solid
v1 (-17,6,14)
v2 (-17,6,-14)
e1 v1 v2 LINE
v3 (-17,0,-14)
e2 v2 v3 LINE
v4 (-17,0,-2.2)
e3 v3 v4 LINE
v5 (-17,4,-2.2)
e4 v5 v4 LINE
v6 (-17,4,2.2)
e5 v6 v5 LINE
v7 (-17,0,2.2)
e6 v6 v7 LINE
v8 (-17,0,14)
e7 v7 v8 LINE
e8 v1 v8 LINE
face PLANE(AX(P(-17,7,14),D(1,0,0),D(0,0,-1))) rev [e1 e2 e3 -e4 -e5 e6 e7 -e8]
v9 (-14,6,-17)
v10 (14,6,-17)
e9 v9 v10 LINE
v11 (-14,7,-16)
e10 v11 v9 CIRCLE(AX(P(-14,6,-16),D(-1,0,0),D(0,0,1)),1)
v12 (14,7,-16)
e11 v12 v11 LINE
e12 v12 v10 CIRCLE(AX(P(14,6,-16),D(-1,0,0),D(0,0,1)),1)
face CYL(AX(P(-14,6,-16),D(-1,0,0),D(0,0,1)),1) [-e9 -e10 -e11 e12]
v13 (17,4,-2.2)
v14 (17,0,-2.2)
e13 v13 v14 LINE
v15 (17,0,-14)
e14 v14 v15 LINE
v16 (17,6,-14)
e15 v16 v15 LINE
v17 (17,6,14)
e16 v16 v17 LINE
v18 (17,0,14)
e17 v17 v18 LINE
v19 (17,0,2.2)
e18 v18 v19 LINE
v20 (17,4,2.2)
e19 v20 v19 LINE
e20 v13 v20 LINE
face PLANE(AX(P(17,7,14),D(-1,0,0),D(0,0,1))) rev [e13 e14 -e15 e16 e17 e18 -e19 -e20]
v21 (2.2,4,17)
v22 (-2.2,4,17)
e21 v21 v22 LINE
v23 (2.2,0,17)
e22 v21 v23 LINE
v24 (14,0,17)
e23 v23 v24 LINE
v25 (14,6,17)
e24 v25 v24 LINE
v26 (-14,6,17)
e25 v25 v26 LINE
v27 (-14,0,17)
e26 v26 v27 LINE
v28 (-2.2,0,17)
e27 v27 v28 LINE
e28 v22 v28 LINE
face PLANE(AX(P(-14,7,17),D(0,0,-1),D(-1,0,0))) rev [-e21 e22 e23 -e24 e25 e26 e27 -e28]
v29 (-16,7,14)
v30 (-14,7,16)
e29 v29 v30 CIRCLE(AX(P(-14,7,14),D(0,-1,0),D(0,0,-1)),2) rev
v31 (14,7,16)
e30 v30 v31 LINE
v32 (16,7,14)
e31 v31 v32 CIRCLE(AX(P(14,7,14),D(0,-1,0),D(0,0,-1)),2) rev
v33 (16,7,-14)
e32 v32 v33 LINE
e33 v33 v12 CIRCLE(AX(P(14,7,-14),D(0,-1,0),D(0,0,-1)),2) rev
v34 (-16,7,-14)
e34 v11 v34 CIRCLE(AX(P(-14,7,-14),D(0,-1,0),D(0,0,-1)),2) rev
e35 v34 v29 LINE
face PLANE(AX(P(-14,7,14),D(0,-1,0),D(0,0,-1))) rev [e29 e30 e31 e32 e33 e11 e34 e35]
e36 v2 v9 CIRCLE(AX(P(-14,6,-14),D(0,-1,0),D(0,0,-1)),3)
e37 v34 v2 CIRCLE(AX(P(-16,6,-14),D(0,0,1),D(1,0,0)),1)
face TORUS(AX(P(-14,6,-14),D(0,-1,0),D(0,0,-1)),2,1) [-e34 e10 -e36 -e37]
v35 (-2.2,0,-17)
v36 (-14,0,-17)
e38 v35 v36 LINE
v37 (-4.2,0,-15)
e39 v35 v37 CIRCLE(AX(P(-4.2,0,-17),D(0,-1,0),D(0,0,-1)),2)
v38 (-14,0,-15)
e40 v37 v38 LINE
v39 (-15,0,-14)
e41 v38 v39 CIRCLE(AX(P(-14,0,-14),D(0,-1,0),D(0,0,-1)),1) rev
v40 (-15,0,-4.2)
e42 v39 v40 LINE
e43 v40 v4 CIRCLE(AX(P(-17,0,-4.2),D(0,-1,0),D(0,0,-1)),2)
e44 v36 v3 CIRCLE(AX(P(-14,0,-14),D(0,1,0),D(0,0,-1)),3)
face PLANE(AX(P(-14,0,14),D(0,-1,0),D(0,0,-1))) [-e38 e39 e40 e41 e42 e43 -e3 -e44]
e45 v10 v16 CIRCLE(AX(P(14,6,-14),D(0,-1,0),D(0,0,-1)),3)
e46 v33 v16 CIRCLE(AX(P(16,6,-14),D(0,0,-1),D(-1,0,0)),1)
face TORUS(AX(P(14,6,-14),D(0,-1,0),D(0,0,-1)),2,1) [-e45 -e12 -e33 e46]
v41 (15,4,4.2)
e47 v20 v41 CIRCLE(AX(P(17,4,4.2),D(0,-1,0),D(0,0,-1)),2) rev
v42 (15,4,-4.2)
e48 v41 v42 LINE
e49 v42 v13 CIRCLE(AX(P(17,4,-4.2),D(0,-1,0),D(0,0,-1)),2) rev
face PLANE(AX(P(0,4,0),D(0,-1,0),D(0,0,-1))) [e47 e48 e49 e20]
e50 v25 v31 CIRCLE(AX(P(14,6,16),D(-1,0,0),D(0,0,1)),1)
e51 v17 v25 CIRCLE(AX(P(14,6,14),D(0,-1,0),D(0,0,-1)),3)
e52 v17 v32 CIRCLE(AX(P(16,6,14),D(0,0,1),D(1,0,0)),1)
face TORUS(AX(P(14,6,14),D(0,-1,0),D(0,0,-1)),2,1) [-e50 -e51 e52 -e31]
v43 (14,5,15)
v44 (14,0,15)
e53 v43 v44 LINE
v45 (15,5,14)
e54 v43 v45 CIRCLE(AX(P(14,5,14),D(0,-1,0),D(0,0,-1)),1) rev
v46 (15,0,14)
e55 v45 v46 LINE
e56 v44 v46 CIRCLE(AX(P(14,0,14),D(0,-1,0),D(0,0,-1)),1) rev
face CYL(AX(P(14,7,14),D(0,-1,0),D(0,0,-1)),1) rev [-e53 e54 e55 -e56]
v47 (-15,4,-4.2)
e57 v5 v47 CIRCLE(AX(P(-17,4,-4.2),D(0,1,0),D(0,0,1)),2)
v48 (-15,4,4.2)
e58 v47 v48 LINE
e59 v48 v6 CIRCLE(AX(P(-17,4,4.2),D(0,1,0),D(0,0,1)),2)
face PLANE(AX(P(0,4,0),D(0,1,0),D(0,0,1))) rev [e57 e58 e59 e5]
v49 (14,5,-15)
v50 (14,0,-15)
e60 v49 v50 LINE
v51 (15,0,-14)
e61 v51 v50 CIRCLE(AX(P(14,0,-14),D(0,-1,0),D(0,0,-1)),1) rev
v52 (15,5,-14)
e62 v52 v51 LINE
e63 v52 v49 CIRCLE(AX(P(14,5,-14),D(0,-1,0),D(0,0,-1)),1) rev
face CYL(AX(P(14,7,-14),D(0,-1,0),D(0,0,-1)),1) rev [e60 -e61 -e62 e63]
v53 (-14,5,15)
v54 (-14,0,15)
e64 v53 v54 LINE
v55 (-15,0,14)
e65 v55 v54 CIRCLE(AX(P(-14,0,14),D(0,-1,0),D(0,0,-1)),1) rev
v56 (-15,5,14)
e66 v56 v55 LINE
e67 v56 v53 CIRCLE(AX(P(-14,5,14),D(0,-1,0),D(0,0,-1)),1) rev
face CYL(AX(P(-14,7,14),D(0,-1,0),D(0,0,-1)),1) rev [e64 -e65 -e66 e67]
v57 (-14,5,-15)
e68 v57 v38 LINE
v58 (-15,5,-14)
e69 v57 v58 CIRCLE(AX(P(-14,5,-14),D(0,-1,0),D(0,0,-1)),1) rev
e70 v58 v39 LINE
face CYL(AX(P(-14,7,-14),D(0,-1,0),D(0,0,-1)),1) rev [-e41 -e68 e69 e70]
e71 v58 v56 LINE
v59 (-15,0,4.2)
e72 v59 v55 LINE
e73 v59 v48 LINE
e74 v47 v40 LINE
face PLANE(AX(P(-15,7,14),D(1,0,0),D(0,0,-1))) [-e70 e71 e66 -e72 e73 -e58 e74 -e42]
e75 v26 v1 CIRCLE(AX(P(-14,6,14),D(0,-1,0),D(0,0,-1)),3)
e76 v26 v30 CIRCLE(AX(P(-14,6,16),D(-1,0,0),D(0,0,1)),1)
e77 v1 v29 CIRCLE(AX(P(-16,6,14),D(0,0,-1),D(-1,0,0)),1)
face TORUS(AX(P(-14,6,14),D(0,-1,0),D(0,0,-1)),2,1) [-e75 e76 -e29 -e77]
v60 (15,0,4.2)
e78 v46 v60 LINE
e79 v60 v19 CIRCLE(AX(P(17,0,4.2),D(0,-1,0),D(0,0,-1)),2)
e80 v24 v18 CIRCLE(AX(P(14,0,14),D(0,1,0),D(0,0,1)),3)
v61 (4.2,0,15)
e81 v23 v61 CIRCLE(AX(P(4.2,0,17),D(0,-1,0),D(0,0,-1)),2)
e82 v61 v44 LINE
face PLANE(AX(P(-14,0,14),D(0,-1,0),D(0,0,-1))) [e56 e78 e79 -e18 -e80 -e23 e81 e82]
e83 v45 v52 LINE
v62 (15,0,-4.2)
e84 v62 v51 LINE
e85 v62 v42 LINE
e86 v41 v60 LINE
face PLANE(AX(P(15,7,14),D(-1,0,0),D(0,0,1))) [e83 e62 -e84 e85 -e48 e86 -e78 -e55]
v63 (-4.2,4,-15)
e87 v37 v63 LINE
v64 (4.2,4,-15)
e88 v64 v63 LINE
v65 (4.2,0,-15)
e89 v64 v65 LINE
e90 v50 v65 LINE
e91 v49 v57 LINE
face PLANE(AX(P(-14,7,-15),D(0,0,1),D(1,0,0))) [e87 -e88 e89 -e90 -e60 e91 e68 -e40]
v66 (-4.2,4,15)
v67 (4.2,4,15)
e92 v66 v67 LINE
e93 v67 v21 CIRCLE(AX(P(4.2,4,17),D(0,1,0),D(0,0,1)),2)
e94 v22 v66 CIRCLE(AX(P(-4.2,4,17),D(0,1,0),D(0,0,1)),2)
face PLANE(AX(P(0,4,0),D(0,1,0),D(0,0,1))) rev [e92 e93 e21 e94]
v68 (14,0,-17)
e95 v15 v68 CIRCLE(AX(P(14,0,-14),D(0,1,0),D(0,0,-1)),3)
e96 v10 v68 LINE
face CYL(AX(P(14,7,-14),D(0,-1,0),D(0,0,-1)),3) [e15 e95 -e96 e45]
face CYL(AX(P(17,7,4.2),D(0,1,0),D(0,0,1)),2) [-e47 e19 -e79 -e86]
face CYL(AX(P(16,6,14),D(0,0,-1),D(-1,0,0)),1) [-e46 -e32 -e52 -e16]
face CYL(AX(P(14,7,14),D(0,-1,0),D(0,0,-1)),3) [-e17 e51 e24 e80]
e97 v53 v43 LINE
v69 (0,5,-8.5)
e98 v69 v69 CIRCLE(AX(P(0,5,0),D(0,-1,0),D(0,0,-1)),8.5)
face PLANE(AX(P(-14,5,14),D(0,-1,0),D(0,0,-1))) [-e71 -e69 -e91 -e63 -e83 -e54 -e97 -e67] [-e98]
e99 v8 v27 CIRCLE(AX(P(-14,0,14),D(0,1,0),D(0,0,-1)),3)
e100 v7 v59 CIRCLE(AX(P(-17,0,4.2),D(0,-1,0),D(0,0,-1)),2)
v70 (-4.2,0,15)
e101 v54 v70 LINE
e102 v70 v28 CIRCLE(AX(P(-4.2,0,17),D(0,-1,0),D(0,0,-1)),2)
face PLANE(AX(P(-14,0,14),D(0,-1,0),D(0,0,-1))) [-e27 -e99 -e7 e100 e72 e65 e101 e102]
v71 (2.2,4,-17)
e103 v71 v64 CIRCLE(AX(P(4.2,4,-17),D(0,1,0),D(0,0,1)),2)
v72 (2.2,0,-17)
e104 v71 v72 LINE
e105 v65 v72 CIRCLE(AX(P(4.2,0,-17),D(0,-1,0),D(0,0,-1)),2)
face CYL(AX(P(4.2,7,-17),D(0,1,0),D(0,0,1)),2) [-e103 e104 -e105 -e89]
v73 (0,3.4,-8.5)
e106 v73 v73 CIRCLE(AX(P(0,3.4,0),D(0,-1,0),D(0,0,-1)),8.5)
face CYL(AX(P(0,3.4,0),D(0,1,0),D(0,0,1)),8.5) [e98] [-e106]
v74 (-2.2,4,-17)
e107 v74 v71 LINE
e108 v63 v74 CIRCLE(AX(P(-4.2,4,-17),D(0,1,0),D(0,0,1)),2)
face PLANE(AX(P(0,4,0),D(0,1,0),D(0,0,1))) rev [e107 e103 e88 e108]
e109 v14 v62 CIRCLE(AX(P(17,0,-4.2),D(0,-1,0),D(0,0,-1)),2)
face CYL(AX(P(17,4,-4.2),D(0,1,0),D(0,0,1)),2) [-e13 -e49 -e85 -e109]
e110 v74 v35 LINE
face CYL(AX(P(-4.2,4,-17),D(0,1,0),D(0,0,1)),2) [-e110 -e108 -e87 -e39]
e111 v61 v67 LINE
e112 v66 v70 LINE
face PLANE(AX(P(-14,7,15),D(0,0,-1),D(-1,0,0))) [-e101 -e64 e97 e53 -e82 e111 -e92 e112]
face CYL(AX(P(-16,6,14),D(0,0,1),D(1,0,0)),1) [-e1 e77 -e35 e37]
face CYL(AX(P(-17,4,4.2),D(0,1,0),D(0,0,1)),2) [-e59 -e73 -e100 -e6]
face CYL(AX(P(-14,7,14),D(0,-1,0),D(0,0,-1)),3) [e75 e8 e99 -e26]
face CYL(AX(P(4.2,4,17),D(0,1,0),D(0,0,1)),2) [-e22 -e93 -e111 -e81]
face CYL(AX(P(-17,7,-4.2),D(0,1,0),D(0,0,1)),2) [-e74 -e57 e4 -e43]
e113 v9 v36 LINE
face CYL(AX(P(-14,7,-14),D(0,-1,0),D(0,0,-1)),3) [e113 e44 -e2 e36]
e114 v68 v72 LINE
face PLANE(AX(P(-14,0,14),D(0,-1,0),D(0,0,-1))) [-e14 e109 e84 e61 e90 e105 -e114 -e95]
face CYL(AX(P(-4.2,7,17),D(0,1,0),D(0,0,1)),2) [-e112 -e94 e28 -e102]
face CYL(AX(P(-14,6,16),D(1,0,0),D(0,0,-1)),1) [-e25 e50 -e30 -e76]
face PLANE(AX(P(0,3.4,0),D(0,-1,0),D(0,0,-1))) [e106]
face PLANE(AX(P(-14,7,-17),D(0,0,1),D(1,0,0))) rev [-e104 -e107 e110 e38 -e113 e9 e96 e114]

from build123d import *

# Parameters (mm, degrees)
BOSS_EXTRUDE1_DEPTH = 7
SHELL1_T            = -2
FILLET1_R           = 1
SKETCH2_R           = 8.5
BOSS_EXTRUDE2_DEPTH = 1.6
SKETCH3_W           = 4.4
SKETCH3_H           = 2
SKETCH3_W_2         = 2
SKETCH3_H_2         = 4.4
CUT_EXTRUDE1_DEPTH  = 4
FILLET2_R           = 2


with BuildPart() as part:
    # Sketch1 → Boss-Extrude1 (new body)
    with BuildSketch(Plane(origin=(0, 0, 0), x_dir=(1, 0, 0), z_dir=(0, 1, 0))):
        with BuildLine():
            Line((-14, -17), (14, -17))
            ThreePointArc((14, -17), (16.121320344, -16.121320344), (17, -14))
            Line((17, -14), (17, 14))
            ThreePointArc((17, 14), (16.121320344, 16.121320344), (14, 17))
            Line((14, 17), (-14, 17))
            ThreePointArc((-14, 17), (-16.121320344, 16.121320344), (-17, 14))
            Line((-17, 14), (-17, -14))
            ThreePointArc((-17, -14), (-16.121320344, -16.121320344), (-14, -17))
        make_face()
    extrude(amount=BOSS_EXTRUDE1_DEPTH)

    # Shell1
    shell1_openings = [part.faces().sort_by_distance(p)[0] for p in [
        (0, 0, 0),
    ]]
    offset(amount=SHELL1_T, openings=shell1_openings, kind=Kind.INTERSECTION)

    # Fillet1
    fillet1_edges = [part.edges().sort_by_distance(p)[0] for p in [
        (16.121320344, 7, 16.121320344),
        (17, 7, 0),
        (16.121320344, 7, -16.121320344),
        (0, 7, -17),
        (-16.121320344, 7, -16.121320344),
        (-17, 7, 0),
        (-16.121320344, 7, 16.121320344),
        (0, 7, 17),
    ]]
    fillet(fillet1_edges, radius=FILLET1_R)

    # Sketch2 → Boss-Extrude2 (add)
    with BuildSketch(Plane.XZ.offset(-5)):
        with Locations(Location((0, 0, 0), (0, 0, 270))):
            Circle(SKETCH2_R)
    extrude(amount=BOSS_EXTRUDE2_DEPTH)

    # Sketch3 → Cut-Extrude1 (cut)
    with BuildSketch(Plane.XZ):
        with Locations((0, 16)):
            Rectangle(SKETCH3_W, SKETCH3_H)
        with Locations((-16, 0)):
            Rectangle(SKETCH3_W_2, SKETCH3_H_2)
        with Locations((0, -16)):
            Rectangle(SKETCH3_W, SKETCH3_H)
        with Locations((16, 0)):
            Rectangle(SKETCH3_W_2, SKETCH3_H_2)
    extrude(amount=-CUT_EXTRUDE1_DEPTH, mode=Mode.SUBTRACT)

    # Fillet2
    fillet2_edges = [part.edges().sort_by_distance(p)[0] for p in [
        (-15, 2, -2.2),
        (-15, 2, 2.2),
        (-2.2, 2, 15),
        (2.2, 2, 15),
        (15, 2, 2.2),
        (15, 2, -2.2),
        (2.2, 2, -15),
        (-2.2, 2, -15),
    ]]
    fillet(fillet2_edges, radius=FILLET2_R - 0.0001)  # a hair under: the kernel refuses the full size


solid = part.part
